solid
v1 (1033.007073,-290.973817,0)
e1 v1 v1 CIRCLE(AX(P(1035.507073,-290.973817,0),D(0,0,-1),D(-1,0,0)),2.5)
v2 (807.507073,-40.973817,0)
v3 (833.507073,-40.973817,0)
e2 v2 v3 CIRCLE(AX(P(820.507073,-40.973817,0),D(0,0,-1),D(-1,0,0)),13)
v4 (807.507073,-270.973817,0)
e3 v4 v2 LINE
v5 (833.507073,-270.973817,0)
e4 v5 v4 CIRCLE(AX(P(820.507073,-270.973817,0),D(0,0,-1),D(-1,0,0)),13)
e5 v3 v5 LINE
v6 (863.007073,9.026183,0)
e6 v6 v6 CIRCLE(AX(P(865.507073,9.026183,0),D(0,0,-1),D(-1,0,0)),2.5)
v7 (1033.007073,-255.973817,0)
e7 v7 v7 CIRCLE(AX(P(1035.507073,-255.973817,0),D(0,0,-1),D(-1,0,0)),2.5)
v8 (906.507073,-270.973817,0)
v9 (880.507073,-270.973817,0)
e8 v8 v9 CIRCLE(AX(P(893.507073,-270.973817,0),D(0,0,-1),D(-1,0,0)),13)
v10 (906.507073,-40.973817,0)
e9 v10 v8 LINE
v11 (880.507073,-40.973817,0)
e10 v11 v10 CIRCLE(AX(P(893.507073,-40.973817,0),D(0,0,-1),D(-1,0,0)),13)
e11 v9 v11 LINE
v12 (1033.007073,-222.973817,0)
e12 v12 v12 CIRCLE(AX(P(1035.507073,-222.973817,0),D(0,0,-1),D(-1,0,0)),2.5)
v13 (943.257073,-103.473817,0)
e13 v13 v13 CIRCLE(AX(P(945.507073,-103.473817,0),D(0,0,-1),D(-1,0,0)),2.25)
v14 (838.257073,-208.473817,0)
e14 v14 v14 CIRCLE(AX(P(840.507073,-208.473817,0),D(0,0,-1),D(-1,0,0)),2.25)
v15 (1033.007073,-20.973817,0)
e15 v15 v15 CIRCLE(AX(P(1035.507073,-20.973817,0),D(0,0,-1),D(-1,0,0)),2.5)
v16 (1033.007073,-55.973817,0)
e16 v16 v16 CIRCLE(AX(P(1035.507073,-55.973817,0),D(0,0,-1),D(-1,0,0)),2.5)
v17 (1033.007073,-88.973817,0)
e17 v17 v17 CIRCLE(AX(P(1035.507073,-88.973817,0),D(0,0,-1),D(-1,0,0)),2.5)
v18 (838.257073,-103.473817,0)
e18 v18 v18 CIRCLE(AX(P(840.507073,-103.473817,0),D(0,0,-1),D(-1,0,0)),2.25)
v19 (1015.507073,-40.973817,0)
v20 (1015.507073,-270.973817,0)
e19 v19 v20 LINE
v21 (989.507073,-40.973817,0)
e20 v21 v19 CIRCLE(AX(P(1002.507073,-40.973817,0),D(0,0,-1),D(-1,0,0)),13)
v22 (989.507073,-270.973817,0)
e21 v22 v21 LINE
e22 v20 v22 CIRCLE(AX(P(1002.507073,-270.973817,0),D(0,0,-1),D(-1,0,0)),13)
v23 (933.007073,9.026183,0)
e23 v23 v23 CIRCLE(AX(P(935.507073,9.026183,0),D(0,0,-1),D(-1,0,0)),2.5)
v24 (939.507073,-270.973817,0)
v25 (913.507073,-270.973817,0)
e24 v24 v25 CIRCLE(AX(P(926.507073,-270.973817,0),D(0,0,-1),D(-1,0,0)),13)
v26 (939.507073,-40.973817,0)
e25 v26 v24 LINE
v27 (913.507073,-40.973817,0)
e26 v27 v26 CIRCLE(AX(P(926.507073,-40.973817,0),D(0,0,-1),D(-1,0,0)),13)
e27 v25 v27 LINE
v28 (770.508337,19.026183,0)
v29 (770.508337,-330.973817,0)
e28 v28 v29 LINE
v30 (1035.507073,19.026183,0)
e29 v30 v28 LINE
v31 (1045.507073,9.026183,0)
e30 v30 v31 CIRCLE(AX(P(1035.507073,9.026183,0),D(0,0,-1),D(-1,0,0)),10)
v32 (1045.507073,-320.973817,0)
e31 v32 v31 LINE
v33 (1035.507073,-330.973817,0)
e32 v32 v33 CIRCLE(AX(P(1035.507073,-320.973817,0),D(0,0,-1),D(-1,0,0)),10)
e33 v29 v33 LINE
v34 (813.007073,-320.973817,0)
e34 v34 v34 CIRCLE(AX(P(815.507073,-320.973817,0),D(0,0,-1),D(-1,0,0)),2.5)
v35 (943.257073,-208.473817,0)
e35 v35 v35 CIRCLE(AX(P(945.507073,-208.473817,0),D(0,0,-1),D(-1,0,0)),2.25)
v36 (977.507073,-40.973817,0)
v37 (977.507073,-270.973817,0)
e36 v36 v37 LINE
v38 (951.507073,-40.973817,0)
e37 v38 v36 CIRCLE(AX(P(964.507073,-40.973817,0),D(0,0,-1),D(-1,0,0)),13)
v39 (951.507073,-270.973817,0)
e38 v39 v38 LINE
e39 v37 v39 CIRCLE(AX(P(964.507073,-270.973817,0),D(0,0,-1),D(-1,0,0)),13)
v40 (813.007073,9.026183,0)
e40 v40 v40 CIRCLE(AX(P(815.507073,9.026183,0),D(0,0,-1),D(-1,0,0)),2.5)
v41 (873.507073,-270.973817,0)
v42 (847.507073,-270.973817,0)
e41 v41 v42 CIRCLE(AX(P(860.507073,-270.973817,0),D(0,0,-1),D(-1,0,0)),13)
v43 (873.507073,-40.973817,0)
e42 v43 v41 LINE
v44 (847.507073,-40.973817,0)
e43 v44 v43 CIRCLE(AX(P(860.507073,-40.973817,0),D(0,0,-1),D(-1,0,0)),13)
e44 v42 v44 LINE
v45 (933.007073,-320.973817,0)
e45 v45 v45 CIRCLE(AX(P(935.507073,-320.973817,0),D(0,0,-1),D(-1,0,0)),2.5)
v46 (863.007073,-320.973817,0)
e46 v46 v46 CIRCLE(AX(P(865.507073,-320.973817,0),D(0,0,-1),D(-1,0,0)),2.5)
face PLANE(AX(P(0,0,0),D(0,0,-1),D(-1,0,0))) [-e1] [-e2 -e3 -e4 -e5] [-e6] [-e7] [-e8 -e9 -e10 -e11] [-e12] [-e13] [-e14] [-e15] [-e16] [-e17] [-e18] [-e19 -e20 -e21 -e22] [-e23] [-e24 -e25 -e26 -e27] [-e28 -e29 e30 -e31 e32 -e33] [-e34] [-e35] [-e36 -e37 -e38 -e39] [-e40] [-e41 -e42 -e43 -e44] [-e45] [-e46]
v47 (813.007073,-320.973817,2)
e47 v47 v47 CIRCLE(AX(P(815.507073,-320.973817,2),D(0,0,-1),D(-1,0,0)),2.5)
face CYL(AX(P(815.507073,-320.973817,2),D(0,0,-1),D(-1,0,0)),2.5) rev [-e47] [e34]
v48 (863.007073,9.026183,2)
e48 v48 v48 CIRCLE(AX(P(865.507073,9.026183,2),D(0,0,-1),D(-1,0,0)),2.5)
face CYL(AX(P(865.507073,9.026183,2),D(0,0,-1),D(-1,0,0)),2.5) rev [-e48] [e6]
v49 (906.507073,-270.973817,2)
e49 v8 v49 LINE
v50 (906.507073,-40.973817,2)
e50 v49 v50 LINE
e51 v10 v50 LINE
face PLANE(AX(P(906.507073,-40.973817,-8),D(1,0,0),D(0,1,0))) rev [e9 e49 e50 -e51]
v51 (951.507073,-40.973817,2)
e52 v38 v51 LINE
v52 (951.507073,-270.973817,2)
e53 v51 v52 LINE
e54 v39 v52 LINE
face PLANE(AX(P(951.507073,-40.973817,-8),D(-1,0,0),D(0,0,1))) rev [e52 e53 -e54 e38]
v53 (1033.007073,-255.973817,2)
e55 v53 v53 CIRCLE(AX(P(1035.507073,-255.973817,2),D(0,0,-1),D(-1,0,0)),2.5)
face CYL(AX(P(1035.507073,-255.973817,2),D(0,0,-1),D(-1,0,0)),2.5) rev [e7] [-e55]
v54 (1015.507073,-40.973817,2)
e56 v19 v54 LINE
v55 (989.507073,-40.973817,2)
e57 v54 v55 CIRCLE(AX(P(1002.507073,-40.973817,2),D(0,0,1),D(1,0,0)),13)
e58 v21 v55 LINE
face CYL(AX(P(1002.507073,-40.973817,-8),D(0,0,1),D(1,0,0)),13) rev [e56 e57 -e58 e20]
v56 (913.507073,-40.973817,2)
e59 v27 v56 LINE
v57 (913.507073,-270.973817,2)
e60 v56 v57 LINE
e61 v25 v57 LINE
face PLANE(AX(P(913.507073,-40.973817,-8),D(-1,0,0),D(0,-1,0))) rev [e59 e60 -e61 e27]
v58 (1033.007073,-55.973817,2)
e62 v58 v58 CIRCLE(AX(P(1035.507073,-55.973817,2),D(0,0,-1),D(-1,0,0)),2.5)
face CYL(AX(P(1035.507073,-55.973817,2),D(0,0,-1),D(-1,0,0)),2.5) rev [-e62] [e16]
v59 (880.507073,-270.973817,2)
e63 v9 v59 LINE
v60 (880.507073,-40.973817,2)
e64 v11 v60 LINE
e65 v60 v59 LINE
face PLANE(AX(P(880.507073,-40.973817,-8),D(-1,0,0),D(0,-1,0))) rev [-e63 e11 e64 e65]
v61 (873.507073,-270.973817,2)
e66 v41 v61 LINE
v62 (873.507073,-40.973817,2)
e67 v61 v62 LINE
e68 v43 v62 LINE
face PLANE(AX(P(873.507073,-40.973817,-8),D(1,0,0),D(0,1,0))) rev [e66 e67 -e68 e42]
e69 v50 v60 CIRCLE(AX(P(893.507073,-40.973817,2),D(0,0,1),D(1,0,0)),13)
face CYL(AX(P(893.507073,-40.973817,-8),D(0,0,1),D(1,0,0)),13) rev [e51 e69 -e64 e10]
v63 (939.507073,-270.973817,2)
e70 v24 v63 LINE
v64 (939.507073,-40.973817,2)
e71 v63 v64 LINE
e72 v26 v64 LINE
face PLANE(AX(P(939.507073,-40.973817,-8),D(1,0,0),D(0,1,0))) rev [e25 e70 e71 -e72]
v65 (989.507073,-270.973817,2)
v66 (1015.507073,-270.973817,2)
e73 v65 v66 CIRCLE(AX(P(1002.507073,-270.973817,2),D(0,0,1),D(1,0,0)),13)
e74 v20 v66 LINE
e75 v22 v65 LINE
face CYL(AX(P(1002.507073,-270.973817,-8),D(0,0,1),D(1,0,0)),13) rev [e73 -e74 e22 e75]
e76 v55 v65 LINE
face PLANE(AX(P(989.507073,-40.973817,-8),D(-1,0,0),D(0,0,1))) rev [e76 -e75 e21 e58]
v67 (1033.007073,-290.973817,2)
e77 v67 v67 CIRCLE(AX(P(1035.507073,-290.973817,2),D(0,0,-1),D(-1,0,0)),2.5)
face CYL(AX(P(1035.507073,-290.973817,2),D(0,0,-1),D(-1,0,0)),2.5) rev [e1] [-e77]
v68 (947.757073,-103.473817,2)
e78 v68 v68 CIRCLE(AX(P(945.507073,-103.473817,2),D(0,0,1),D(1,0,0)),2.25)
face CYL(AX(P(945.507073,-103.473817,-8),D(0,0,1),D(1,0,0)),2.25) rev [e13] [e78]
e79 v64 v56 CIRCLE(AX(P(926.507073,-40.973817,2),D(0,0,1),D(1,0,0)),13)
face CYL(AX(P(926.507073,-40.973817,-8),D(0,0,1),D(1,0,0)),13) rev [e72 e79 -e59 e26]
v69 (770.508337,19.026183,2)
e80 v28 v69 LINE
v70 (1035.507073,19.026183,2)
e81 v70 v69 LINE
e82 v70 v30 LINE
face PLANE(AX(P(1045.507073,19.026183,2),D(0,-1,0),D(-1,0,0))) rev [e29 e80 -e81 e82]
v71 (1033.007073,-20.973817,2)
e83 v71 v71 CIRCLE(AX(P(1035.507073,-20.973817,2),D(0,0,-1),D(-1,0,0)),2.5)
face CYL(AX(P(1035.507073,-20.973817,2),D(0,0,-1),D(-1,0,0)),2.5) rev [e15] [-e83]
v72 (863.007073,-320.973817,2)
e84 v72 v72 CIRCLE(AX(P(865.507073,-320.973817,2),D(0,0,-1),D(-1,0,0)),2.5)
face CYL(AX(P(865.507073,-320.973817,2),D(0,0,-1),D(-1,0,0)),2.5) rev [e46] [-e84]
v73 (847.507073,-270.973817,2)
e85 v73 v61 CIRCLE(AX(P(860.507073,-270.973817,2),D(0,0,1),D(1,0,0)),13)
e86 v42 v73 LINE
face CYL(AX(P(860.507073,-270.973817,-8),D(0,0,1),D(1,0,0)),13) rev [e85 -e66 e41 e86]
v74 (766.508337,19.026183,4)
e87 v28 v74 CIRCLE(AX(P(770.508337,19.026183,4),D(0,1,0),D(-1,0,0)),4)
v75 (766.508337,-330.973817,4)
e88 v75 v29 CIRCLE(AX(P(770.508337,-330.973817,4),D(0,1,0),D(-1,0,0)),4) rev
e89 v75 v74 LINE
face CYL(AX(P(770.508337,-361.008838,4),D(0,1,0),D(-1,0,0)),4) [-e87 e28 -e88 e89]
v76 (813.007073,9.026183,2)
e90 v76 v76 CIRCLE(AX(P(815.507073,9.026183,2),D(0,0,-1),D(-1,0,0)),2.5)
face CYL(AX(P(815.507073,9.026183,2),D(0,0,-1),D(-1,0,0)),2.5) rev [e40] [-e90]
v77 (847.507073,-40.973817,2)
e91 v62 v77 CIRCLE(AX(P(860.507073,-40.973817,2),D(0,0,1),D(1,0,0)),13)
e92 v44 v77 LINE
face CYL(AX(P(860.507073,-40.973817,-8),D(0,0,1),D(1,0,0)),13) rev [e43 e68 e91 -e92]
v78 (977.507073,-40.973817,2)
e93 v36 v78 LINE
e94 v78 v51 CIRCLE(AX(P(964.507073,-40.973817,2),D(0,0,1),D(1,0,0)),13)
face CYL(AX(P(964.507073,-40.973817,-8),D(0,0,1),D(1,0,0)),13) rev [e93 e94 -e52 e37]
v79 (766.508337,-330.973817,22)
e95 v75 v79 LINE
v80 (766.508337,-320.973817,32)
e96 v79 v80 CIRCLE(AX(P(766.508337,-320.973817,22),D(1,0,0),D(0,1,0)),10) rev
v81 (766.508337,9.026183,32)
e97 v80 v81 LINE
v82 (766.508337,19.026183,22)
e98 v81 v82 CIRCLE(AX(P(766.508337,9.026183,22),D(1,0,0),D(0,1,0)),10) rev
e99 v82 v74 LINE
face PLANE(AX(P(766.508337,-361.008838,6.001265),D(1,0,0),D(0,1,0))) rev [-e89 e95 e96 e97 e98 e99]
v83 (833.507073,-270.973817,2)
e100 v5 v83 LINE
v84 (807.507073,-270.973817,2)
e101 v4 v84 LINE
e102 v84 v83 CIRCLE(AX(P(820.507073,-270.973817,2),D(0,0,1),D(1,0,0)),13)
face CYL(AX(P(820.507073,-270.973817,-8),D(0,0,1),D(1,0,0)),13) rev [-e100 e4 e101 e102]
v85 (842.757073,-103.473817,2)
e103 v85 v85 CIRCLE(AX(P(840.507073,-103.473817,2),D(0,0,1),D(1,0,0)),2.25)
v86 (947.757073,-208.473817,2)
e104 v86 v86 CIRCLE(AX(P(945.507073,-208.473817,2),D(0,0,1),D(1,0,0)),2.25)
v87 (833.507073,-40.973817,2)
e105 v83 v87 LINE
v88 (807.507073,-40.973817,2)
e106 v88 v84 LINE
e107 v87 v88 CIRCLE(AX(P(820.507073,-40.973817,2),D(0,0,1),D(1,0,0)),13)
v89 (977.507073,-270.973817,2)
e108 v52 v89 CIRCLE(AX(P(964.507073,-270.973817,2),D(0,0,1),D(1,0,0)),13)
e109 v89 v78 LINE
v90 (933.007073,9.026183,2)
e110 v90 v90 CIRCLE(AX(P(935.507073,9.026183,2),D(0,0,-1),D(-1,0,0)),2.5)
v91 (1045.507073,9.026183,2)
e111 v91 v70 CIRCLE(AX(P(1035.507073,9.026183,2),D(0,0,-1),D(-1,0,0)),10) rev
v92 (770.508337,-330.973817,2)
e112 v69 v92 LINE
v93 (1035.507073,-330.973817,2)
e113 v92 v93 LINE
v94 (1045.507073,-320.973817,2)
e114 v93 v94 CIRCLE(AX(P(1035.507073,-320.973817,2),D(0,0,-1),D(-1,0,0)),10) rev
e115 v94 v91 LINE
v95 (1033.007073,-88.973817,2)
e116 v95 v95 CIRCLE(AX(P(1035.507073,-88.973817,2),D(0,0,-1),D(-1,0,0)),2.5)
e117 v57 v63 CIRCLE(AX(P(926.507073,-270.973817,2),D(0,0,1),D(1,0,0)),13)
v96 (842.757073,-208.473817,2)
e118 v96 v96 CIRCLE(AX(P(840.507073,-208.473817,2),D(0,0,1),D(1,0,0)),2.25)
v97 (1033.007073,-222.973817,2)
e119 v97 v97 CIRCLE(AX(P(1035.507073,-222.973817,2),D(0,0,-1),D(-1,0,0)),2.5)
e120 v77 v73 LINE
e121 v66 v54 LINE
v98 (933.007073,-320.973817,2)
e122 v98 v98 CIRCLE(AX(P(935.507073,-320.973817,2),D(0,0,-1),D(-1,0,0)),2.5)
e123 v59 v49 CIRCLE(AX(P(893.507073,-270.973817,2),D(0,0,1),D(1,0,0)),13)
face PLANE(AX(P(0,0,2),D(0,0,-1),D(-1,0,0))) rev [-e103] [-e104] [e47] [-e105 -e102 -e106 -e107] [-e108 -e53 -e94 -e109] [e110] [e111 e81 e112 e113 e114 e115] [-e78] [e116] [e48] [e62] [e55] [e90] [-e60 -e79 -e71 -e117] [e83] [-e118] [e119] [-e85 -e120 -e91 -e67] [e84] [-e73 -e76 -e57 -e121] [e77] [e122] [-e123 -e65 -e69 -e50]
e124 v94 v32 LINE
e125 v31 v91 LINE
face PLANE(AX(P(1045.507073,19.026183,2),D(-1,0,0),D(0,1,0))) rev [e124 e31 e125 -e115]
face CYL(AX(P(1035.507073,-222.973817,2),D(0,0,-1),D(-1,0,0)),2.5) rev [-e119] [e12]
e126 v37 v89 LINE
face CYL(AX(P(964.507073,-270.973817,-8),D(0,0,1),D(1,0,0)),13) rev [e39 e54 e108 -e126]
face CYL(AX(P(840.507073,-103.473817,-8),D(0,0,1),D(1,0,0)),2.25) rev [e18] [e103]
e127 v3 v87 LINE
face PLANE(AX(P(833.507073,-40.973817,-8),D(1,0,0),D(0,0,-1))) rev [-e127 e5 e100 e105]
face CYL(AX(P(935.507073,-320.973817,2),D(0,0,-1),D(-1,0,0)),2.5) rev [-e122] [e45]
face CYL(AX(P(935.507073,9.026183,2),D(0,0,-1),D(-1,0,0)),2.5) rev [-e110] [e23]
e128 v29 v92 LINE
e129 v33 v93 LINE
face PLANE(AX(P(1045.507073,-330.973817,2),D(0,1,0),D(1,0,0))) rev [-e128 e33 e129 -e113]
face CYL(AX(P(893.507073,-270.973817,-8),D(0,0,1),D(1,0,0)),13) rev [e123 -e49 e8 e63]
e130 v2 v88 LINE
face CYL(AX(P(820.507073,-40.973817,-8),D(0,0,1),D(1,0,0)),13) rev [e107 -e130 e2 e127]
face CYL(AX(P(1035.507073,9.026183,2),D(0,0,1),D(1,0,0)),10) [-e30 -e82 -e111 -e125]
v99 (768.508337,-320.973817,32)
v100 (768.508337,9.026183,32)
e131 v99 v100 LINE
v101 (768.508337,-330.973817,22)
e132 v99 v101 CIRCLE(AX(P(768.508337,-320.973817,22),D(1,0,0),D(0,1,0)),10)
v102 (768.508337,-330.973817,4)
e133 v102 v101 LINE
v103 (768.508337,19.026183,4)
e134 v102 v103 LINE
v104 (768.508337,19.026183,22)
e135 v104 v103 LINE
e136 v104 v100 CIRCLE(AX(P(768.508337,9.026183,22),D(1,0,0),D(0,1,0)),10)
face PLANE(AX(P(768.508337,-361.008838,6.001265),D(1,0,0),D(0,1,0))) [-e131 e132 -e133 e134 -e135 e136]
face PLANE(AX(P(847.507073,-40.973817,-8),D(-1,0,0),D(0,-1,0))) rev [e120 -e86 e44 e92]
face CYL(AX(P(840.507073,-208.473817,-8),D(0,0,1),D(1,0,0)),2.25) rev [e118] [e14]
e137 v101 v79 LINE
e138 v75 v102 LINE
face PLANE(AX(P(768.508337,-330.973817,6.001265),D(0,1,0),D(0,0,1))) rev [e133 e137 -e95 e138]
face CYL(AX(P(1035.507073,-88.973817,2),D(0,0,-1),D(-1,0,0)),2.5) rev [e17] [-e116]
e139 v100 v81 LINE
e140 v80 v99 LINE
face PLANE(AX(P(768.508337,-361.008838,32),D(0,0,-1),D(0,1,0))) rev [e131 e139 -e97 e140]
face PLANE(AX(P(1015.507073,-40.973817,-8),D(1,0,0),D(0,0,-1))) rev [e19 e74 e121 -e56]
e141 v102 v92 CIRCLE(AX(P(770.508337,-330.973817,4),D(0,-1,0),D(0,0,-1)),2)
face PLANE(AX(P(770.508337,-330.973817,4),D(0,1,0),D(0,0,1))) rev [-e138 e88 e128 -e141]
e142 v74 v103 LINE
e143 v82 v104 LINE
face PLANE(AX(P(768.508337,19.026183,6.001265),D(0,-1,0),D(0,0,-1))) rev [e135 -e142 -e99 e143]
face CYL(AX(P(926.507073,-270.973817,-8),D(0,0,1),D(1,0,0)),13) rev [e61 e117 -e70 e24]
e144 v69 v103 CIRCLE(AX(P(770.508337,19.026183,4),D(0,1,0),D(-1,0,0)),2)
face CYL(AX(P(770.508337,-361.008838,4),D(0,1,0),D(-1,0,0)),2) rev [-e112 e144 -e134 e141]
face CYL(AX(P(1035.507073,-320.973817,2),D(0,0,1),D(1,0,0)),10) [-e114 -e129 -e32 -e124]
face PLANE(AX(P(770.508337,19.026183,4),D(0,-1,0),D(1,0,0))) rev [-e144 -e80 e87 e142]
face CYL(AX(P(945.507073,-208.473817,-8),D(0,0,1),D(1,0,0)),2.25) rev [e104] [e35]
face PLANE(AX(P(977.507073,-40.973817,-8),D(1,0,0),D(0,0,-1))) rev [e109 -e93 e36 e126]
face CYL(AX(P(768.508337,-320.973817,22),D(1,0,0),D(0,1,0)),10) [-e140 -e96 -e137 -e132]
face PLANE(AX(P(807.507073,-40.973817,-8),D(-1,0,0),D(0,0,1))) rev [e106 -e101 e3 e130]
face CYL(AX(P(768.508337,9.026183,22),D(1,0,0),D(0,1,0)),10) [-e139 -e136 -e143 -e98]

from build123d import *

# Parameters (mm, degrees)
SKETCH_1_W            = 280
SKETCH_1_H            = 350
EXTRUDE_1_DEPTH       = 2
SKETCH_2_W            = 1.551264613
SKETCH_2_H            = 30
EXTRUDE_2_DEPTH       = 350
EXTRUDE_3_DEPTH       = 350
SKETCH_3_R            = 2.5
CUT_EXTRUDE_1_DEPTH   = 1119.062393976
SHEET_START           = -330.973817188
SHEET_METAL_1_DEPTH   = 350
SHEET_METAL_1_2_DEPTH = 350
SKETCH_29_R           = 2.25
CUT_EXTRUDE_3_DEPTH   = 10
FILLET_1_R            = 10


# Read off the part's stored shape, not the designer's step: 솔리드-변환1
with BuildPart() as part:
    # 스케치1 → 보스-돌출1 (new body)
    with BuildSketch(Plane.XY):
        with Locations((905.507072504, -155.973817188)):
            Rectangle(SKETCH_1_W, SKETCH_1_H)
    extrude(amount=EXTRUDE_1_DEPTH)

    # 스케치2 → 보스-돌출2 (add)
    with BuildSketch(Plane(origin=(0, 19.026182812, 0), x_dir=(1, 0, 0), z_dir=(0, 1, 0))):
        with Locations((766.282704811, -17)):
            Rectangle(SKETCH_2_W, SKETCH_2_H)
    extrude(amount=-EXTRUDE_2_DEPTH)

    # 스케치10 → 보스-돌출3 (add)
    with BuildSketch(Plane(origin=(0, 19.026182812, 0), x_dir=(1, 0, 0), z_dir=(0, 1, 0))):
        Polygon((767.058337117, -2), (768.508337117, -2), (768.508337117, -6.001264612), (768.508337117, -32), (767.058337117, -32), align=None)
    extrude(amount=-EXTRUDE_3_DEPTH)

    # 스케치3 → 컷-돌출1 (cut, through all)
    with BuildSketch(Plane(origin=(1.179072504, 0, -191.38056669), x_dir=(1, 0, 0), z_dir=(0, 0, -1))):
        with Locations(Location((1034.328, 255.973817188, 0), (0, 0, 180))):
            Circle(SKETCH_3_R)
        with Locations(Location((1034.328, 55.973817188, 0), (0, 0, 180))):
            Circle(SKETCH_3_R)
        with Locations(Location((864.328, -9.026182812, 0), (0, 0, 180))):
            Circle(SKETCH_3_R)
        with Locations(Location((814.328, -9.026182812, 0), (0, 0, 180))):
            Circle(SKETCH_3_R)
        with Locations(Location((864.328, 320.973817188, 0), (0, 0, 180))):
            Circle(SKETCH_3_R)
        with Locations(Location((814.328, 320.973817188, 0), (0, 0, 180))):
            Circle(SKETCH_3_R)
        with Locations(Location((1034.328, 290.973817188, 0), (0, 0, 180))):
            Circle(SKETCH_3_R)
        with Locations(Location((1034.328, 20.973817188, 0), (0, 0, 180))):
            Circle(SKETCH_3_R)
        with Locations(Location((934.328, 320.973817188, 0), (0, 0, 180))):
            Circle(SKETCH_3_R)
        with Locations(Location((934.328, -9.026182812, 0), (0, 0, 180))):
            Circle(SKETCH_3_R)
        with Locations(Location((1034.328, 88.973817188, 0), (0, 0, 180))):
            Circle(SKETCH_3_R)
        with Locations(Location((1034.328, 222.973817188, 0), (0, 0, 180))):
            Circle(SKETCH_3_R)
    extrude(amount=-CUT_EXTRUDE_1_DEPTH, mode=Mode.SUBTRACT)

    # Sheet Metal 1 outline → Sheet Metal 1 (cut)
    with BuildSketch(Plane(origin=(0, 0, 0), x_dir=(1, 0, 0), z_dir=(0, 1, 0)).offset(SHEET_START)):
        with BuildLine():
            Line((765.507072504, -32), (766.508337117, -32))
            Line((766.508337117, -32), (766.508337117, -4))
            ThreePointArc((766.508337117, -4), (767.679909992, -1.171572875), (770.508337117, 0))
            Line((770.508337117, 0), (765.507072504, 0))
            Line((765.507072504, 0), (765.507072504, -32))
        make_face()
    extrude(amount=SHEET_METAL_1_DEPTH, mode=Mode.SUBTRACT)

    # Sheet Metal 1 2 outline → Sheet Metal 1 2 (add)
    with BuildSketch(Plane(origin=(0, 0, 0), x_dir=(1, 0, 0), z_dir=(0, 1, 0)).offset(SHEET_START)):
        with BuildLine():
            ThreePointArc((768.508337117, -4), (769.094123555, -2.585786438), (770.508337117, -2))
            Line((770.508337117, -2), (768.508337117, -2))
            Line((768.508337117, -2), (768.508337117, -4))
        make_face()
    extrude(amount=SHEET_METAL_1_2_DEPTH)

    # 스케치29 → 컷-돌출3 (cut)
    with BuildSketch(Plane.XY.offset(2)):
        with Locations((945.507072504, -103.473817188)):
            Circle(SKETCH_29_R)
        with Locations((945.507072504, -208.473817188)):
            Circle(SKETCH_29_R)
        with Locations((840.507072504, -103.473817188)):
            Circle(SKETCH_29_R)
        with Locations((840.507072504, -208.473817188)):
            Circle(SKETCH_29_R)
        with BuildLine():
            Line((1015.507072504, -40.973817188), (1015.507072504, -270.973817188))
            ThreePointArc((1015.507072504, -270.973817188), (1002.507072504, -283.973817188), (989.507072504, -270.973817188))
            Line((989.507072504, -270.973817188), (989.507072504, -40.973817188))
            ThreePointArc((989.507072504, -40.973817188), (1002.507072504, -27.973817188), (1015.507072504, -40.973817188))
        make_face()
        with BuildLine():
            Line((977.507072504, -40.973817188), (977.507072504, -270.973817188))
            ThreePointArc((977.507072504, -270.973817188), (964.507072504, -283.973817188), (951.507072504, -270.973817188))
            Line((951.507072504, -270.973817188), (951.507072504, -40.973817188))
            ThreePointArc((951.507072504, -40.973817188), (964.507072504, -27.973817188), (977.507072504, -40.973817188))
        make_face()
        with BuildLine():
            Line((939.507072504, -40.973817188), (939.507072504, -270.973817188))
            ThreePointArc((939.507072504, -270.973817188), (926.507072504, -283.973817188), (913.507072504, -270.973817188))
            Line((913.507072504, -270.973817188), (913.507072504, -40.973817188))
            ThreePointArc((913.507072504, -40.973817188), (926.507072504, -27.973817188), (939.507072504, -40.973817188))
        make_face()
        with BuildLine():
            Line((906.507072504, -40.973817188), (906.507072504, -270.973817188))
            ThreePointArc((906.507072504, -270.973817188), (893.507072504, -283.973817188), (880.507072504, -270.973817188))
            Line((880.507072504, -270.973817188), (880.507072504, -40.973817188))
            ThreePointArc((880.507072504, -40.973817188), (893.507072504, -27.973817188), (906.507072504, -40.973817188))
        make_face()
        with BuildLine():
            Line((873.507072504, -40.973817188), (873.507072504, -270.973817188))
            ThreePointArc((873.507072504, -270.973817188), (860.507072504, -283.973817188), (847.507072504, -270.973817188))
            Line((847.507072504, -270.973817188), (847.507072504, -40.973817188))
            ThreePointArc((847.507072504, -40.973817188), (860.507072504, -27.973817188), (873.507072504, -40.973817188))
        make_face()
        with BuildLine():
            Line((833.507072504, -40.973817188), (833.507072504, -270.973817188))
            ThreePointArc((833.507072504, -270.973817188), (820.507072504, -283.973817188), (807.507072504, -270.973817188))
            Line((807.507072504, -270.973817188), (807.507072504, -40.973817188))
            ThreePointArc((807.507072504, -40.973817188), (820.507072504, -27.973817188), (833.507072504, -40.973817188))
        make_face()
    extrude(amount=-CUT_EXTRUDE_3_DEPTH, mode=Mode.SUBTRACT)

    # 필렛1
    fillet_1_edges = [part.edges().sort_by_distance(p)[0] for p in [
        (1045.507072504, 19.026182812, 1),
        (1045.507072504, -330.973817188, 1),
        (767.508337117, -330.973817188, 32),
        (767.508337117, 19.026182812, 32),
    ]]
    fillet(fillet_1_edges, radius=FILLET_1_R)


solid = part.part
